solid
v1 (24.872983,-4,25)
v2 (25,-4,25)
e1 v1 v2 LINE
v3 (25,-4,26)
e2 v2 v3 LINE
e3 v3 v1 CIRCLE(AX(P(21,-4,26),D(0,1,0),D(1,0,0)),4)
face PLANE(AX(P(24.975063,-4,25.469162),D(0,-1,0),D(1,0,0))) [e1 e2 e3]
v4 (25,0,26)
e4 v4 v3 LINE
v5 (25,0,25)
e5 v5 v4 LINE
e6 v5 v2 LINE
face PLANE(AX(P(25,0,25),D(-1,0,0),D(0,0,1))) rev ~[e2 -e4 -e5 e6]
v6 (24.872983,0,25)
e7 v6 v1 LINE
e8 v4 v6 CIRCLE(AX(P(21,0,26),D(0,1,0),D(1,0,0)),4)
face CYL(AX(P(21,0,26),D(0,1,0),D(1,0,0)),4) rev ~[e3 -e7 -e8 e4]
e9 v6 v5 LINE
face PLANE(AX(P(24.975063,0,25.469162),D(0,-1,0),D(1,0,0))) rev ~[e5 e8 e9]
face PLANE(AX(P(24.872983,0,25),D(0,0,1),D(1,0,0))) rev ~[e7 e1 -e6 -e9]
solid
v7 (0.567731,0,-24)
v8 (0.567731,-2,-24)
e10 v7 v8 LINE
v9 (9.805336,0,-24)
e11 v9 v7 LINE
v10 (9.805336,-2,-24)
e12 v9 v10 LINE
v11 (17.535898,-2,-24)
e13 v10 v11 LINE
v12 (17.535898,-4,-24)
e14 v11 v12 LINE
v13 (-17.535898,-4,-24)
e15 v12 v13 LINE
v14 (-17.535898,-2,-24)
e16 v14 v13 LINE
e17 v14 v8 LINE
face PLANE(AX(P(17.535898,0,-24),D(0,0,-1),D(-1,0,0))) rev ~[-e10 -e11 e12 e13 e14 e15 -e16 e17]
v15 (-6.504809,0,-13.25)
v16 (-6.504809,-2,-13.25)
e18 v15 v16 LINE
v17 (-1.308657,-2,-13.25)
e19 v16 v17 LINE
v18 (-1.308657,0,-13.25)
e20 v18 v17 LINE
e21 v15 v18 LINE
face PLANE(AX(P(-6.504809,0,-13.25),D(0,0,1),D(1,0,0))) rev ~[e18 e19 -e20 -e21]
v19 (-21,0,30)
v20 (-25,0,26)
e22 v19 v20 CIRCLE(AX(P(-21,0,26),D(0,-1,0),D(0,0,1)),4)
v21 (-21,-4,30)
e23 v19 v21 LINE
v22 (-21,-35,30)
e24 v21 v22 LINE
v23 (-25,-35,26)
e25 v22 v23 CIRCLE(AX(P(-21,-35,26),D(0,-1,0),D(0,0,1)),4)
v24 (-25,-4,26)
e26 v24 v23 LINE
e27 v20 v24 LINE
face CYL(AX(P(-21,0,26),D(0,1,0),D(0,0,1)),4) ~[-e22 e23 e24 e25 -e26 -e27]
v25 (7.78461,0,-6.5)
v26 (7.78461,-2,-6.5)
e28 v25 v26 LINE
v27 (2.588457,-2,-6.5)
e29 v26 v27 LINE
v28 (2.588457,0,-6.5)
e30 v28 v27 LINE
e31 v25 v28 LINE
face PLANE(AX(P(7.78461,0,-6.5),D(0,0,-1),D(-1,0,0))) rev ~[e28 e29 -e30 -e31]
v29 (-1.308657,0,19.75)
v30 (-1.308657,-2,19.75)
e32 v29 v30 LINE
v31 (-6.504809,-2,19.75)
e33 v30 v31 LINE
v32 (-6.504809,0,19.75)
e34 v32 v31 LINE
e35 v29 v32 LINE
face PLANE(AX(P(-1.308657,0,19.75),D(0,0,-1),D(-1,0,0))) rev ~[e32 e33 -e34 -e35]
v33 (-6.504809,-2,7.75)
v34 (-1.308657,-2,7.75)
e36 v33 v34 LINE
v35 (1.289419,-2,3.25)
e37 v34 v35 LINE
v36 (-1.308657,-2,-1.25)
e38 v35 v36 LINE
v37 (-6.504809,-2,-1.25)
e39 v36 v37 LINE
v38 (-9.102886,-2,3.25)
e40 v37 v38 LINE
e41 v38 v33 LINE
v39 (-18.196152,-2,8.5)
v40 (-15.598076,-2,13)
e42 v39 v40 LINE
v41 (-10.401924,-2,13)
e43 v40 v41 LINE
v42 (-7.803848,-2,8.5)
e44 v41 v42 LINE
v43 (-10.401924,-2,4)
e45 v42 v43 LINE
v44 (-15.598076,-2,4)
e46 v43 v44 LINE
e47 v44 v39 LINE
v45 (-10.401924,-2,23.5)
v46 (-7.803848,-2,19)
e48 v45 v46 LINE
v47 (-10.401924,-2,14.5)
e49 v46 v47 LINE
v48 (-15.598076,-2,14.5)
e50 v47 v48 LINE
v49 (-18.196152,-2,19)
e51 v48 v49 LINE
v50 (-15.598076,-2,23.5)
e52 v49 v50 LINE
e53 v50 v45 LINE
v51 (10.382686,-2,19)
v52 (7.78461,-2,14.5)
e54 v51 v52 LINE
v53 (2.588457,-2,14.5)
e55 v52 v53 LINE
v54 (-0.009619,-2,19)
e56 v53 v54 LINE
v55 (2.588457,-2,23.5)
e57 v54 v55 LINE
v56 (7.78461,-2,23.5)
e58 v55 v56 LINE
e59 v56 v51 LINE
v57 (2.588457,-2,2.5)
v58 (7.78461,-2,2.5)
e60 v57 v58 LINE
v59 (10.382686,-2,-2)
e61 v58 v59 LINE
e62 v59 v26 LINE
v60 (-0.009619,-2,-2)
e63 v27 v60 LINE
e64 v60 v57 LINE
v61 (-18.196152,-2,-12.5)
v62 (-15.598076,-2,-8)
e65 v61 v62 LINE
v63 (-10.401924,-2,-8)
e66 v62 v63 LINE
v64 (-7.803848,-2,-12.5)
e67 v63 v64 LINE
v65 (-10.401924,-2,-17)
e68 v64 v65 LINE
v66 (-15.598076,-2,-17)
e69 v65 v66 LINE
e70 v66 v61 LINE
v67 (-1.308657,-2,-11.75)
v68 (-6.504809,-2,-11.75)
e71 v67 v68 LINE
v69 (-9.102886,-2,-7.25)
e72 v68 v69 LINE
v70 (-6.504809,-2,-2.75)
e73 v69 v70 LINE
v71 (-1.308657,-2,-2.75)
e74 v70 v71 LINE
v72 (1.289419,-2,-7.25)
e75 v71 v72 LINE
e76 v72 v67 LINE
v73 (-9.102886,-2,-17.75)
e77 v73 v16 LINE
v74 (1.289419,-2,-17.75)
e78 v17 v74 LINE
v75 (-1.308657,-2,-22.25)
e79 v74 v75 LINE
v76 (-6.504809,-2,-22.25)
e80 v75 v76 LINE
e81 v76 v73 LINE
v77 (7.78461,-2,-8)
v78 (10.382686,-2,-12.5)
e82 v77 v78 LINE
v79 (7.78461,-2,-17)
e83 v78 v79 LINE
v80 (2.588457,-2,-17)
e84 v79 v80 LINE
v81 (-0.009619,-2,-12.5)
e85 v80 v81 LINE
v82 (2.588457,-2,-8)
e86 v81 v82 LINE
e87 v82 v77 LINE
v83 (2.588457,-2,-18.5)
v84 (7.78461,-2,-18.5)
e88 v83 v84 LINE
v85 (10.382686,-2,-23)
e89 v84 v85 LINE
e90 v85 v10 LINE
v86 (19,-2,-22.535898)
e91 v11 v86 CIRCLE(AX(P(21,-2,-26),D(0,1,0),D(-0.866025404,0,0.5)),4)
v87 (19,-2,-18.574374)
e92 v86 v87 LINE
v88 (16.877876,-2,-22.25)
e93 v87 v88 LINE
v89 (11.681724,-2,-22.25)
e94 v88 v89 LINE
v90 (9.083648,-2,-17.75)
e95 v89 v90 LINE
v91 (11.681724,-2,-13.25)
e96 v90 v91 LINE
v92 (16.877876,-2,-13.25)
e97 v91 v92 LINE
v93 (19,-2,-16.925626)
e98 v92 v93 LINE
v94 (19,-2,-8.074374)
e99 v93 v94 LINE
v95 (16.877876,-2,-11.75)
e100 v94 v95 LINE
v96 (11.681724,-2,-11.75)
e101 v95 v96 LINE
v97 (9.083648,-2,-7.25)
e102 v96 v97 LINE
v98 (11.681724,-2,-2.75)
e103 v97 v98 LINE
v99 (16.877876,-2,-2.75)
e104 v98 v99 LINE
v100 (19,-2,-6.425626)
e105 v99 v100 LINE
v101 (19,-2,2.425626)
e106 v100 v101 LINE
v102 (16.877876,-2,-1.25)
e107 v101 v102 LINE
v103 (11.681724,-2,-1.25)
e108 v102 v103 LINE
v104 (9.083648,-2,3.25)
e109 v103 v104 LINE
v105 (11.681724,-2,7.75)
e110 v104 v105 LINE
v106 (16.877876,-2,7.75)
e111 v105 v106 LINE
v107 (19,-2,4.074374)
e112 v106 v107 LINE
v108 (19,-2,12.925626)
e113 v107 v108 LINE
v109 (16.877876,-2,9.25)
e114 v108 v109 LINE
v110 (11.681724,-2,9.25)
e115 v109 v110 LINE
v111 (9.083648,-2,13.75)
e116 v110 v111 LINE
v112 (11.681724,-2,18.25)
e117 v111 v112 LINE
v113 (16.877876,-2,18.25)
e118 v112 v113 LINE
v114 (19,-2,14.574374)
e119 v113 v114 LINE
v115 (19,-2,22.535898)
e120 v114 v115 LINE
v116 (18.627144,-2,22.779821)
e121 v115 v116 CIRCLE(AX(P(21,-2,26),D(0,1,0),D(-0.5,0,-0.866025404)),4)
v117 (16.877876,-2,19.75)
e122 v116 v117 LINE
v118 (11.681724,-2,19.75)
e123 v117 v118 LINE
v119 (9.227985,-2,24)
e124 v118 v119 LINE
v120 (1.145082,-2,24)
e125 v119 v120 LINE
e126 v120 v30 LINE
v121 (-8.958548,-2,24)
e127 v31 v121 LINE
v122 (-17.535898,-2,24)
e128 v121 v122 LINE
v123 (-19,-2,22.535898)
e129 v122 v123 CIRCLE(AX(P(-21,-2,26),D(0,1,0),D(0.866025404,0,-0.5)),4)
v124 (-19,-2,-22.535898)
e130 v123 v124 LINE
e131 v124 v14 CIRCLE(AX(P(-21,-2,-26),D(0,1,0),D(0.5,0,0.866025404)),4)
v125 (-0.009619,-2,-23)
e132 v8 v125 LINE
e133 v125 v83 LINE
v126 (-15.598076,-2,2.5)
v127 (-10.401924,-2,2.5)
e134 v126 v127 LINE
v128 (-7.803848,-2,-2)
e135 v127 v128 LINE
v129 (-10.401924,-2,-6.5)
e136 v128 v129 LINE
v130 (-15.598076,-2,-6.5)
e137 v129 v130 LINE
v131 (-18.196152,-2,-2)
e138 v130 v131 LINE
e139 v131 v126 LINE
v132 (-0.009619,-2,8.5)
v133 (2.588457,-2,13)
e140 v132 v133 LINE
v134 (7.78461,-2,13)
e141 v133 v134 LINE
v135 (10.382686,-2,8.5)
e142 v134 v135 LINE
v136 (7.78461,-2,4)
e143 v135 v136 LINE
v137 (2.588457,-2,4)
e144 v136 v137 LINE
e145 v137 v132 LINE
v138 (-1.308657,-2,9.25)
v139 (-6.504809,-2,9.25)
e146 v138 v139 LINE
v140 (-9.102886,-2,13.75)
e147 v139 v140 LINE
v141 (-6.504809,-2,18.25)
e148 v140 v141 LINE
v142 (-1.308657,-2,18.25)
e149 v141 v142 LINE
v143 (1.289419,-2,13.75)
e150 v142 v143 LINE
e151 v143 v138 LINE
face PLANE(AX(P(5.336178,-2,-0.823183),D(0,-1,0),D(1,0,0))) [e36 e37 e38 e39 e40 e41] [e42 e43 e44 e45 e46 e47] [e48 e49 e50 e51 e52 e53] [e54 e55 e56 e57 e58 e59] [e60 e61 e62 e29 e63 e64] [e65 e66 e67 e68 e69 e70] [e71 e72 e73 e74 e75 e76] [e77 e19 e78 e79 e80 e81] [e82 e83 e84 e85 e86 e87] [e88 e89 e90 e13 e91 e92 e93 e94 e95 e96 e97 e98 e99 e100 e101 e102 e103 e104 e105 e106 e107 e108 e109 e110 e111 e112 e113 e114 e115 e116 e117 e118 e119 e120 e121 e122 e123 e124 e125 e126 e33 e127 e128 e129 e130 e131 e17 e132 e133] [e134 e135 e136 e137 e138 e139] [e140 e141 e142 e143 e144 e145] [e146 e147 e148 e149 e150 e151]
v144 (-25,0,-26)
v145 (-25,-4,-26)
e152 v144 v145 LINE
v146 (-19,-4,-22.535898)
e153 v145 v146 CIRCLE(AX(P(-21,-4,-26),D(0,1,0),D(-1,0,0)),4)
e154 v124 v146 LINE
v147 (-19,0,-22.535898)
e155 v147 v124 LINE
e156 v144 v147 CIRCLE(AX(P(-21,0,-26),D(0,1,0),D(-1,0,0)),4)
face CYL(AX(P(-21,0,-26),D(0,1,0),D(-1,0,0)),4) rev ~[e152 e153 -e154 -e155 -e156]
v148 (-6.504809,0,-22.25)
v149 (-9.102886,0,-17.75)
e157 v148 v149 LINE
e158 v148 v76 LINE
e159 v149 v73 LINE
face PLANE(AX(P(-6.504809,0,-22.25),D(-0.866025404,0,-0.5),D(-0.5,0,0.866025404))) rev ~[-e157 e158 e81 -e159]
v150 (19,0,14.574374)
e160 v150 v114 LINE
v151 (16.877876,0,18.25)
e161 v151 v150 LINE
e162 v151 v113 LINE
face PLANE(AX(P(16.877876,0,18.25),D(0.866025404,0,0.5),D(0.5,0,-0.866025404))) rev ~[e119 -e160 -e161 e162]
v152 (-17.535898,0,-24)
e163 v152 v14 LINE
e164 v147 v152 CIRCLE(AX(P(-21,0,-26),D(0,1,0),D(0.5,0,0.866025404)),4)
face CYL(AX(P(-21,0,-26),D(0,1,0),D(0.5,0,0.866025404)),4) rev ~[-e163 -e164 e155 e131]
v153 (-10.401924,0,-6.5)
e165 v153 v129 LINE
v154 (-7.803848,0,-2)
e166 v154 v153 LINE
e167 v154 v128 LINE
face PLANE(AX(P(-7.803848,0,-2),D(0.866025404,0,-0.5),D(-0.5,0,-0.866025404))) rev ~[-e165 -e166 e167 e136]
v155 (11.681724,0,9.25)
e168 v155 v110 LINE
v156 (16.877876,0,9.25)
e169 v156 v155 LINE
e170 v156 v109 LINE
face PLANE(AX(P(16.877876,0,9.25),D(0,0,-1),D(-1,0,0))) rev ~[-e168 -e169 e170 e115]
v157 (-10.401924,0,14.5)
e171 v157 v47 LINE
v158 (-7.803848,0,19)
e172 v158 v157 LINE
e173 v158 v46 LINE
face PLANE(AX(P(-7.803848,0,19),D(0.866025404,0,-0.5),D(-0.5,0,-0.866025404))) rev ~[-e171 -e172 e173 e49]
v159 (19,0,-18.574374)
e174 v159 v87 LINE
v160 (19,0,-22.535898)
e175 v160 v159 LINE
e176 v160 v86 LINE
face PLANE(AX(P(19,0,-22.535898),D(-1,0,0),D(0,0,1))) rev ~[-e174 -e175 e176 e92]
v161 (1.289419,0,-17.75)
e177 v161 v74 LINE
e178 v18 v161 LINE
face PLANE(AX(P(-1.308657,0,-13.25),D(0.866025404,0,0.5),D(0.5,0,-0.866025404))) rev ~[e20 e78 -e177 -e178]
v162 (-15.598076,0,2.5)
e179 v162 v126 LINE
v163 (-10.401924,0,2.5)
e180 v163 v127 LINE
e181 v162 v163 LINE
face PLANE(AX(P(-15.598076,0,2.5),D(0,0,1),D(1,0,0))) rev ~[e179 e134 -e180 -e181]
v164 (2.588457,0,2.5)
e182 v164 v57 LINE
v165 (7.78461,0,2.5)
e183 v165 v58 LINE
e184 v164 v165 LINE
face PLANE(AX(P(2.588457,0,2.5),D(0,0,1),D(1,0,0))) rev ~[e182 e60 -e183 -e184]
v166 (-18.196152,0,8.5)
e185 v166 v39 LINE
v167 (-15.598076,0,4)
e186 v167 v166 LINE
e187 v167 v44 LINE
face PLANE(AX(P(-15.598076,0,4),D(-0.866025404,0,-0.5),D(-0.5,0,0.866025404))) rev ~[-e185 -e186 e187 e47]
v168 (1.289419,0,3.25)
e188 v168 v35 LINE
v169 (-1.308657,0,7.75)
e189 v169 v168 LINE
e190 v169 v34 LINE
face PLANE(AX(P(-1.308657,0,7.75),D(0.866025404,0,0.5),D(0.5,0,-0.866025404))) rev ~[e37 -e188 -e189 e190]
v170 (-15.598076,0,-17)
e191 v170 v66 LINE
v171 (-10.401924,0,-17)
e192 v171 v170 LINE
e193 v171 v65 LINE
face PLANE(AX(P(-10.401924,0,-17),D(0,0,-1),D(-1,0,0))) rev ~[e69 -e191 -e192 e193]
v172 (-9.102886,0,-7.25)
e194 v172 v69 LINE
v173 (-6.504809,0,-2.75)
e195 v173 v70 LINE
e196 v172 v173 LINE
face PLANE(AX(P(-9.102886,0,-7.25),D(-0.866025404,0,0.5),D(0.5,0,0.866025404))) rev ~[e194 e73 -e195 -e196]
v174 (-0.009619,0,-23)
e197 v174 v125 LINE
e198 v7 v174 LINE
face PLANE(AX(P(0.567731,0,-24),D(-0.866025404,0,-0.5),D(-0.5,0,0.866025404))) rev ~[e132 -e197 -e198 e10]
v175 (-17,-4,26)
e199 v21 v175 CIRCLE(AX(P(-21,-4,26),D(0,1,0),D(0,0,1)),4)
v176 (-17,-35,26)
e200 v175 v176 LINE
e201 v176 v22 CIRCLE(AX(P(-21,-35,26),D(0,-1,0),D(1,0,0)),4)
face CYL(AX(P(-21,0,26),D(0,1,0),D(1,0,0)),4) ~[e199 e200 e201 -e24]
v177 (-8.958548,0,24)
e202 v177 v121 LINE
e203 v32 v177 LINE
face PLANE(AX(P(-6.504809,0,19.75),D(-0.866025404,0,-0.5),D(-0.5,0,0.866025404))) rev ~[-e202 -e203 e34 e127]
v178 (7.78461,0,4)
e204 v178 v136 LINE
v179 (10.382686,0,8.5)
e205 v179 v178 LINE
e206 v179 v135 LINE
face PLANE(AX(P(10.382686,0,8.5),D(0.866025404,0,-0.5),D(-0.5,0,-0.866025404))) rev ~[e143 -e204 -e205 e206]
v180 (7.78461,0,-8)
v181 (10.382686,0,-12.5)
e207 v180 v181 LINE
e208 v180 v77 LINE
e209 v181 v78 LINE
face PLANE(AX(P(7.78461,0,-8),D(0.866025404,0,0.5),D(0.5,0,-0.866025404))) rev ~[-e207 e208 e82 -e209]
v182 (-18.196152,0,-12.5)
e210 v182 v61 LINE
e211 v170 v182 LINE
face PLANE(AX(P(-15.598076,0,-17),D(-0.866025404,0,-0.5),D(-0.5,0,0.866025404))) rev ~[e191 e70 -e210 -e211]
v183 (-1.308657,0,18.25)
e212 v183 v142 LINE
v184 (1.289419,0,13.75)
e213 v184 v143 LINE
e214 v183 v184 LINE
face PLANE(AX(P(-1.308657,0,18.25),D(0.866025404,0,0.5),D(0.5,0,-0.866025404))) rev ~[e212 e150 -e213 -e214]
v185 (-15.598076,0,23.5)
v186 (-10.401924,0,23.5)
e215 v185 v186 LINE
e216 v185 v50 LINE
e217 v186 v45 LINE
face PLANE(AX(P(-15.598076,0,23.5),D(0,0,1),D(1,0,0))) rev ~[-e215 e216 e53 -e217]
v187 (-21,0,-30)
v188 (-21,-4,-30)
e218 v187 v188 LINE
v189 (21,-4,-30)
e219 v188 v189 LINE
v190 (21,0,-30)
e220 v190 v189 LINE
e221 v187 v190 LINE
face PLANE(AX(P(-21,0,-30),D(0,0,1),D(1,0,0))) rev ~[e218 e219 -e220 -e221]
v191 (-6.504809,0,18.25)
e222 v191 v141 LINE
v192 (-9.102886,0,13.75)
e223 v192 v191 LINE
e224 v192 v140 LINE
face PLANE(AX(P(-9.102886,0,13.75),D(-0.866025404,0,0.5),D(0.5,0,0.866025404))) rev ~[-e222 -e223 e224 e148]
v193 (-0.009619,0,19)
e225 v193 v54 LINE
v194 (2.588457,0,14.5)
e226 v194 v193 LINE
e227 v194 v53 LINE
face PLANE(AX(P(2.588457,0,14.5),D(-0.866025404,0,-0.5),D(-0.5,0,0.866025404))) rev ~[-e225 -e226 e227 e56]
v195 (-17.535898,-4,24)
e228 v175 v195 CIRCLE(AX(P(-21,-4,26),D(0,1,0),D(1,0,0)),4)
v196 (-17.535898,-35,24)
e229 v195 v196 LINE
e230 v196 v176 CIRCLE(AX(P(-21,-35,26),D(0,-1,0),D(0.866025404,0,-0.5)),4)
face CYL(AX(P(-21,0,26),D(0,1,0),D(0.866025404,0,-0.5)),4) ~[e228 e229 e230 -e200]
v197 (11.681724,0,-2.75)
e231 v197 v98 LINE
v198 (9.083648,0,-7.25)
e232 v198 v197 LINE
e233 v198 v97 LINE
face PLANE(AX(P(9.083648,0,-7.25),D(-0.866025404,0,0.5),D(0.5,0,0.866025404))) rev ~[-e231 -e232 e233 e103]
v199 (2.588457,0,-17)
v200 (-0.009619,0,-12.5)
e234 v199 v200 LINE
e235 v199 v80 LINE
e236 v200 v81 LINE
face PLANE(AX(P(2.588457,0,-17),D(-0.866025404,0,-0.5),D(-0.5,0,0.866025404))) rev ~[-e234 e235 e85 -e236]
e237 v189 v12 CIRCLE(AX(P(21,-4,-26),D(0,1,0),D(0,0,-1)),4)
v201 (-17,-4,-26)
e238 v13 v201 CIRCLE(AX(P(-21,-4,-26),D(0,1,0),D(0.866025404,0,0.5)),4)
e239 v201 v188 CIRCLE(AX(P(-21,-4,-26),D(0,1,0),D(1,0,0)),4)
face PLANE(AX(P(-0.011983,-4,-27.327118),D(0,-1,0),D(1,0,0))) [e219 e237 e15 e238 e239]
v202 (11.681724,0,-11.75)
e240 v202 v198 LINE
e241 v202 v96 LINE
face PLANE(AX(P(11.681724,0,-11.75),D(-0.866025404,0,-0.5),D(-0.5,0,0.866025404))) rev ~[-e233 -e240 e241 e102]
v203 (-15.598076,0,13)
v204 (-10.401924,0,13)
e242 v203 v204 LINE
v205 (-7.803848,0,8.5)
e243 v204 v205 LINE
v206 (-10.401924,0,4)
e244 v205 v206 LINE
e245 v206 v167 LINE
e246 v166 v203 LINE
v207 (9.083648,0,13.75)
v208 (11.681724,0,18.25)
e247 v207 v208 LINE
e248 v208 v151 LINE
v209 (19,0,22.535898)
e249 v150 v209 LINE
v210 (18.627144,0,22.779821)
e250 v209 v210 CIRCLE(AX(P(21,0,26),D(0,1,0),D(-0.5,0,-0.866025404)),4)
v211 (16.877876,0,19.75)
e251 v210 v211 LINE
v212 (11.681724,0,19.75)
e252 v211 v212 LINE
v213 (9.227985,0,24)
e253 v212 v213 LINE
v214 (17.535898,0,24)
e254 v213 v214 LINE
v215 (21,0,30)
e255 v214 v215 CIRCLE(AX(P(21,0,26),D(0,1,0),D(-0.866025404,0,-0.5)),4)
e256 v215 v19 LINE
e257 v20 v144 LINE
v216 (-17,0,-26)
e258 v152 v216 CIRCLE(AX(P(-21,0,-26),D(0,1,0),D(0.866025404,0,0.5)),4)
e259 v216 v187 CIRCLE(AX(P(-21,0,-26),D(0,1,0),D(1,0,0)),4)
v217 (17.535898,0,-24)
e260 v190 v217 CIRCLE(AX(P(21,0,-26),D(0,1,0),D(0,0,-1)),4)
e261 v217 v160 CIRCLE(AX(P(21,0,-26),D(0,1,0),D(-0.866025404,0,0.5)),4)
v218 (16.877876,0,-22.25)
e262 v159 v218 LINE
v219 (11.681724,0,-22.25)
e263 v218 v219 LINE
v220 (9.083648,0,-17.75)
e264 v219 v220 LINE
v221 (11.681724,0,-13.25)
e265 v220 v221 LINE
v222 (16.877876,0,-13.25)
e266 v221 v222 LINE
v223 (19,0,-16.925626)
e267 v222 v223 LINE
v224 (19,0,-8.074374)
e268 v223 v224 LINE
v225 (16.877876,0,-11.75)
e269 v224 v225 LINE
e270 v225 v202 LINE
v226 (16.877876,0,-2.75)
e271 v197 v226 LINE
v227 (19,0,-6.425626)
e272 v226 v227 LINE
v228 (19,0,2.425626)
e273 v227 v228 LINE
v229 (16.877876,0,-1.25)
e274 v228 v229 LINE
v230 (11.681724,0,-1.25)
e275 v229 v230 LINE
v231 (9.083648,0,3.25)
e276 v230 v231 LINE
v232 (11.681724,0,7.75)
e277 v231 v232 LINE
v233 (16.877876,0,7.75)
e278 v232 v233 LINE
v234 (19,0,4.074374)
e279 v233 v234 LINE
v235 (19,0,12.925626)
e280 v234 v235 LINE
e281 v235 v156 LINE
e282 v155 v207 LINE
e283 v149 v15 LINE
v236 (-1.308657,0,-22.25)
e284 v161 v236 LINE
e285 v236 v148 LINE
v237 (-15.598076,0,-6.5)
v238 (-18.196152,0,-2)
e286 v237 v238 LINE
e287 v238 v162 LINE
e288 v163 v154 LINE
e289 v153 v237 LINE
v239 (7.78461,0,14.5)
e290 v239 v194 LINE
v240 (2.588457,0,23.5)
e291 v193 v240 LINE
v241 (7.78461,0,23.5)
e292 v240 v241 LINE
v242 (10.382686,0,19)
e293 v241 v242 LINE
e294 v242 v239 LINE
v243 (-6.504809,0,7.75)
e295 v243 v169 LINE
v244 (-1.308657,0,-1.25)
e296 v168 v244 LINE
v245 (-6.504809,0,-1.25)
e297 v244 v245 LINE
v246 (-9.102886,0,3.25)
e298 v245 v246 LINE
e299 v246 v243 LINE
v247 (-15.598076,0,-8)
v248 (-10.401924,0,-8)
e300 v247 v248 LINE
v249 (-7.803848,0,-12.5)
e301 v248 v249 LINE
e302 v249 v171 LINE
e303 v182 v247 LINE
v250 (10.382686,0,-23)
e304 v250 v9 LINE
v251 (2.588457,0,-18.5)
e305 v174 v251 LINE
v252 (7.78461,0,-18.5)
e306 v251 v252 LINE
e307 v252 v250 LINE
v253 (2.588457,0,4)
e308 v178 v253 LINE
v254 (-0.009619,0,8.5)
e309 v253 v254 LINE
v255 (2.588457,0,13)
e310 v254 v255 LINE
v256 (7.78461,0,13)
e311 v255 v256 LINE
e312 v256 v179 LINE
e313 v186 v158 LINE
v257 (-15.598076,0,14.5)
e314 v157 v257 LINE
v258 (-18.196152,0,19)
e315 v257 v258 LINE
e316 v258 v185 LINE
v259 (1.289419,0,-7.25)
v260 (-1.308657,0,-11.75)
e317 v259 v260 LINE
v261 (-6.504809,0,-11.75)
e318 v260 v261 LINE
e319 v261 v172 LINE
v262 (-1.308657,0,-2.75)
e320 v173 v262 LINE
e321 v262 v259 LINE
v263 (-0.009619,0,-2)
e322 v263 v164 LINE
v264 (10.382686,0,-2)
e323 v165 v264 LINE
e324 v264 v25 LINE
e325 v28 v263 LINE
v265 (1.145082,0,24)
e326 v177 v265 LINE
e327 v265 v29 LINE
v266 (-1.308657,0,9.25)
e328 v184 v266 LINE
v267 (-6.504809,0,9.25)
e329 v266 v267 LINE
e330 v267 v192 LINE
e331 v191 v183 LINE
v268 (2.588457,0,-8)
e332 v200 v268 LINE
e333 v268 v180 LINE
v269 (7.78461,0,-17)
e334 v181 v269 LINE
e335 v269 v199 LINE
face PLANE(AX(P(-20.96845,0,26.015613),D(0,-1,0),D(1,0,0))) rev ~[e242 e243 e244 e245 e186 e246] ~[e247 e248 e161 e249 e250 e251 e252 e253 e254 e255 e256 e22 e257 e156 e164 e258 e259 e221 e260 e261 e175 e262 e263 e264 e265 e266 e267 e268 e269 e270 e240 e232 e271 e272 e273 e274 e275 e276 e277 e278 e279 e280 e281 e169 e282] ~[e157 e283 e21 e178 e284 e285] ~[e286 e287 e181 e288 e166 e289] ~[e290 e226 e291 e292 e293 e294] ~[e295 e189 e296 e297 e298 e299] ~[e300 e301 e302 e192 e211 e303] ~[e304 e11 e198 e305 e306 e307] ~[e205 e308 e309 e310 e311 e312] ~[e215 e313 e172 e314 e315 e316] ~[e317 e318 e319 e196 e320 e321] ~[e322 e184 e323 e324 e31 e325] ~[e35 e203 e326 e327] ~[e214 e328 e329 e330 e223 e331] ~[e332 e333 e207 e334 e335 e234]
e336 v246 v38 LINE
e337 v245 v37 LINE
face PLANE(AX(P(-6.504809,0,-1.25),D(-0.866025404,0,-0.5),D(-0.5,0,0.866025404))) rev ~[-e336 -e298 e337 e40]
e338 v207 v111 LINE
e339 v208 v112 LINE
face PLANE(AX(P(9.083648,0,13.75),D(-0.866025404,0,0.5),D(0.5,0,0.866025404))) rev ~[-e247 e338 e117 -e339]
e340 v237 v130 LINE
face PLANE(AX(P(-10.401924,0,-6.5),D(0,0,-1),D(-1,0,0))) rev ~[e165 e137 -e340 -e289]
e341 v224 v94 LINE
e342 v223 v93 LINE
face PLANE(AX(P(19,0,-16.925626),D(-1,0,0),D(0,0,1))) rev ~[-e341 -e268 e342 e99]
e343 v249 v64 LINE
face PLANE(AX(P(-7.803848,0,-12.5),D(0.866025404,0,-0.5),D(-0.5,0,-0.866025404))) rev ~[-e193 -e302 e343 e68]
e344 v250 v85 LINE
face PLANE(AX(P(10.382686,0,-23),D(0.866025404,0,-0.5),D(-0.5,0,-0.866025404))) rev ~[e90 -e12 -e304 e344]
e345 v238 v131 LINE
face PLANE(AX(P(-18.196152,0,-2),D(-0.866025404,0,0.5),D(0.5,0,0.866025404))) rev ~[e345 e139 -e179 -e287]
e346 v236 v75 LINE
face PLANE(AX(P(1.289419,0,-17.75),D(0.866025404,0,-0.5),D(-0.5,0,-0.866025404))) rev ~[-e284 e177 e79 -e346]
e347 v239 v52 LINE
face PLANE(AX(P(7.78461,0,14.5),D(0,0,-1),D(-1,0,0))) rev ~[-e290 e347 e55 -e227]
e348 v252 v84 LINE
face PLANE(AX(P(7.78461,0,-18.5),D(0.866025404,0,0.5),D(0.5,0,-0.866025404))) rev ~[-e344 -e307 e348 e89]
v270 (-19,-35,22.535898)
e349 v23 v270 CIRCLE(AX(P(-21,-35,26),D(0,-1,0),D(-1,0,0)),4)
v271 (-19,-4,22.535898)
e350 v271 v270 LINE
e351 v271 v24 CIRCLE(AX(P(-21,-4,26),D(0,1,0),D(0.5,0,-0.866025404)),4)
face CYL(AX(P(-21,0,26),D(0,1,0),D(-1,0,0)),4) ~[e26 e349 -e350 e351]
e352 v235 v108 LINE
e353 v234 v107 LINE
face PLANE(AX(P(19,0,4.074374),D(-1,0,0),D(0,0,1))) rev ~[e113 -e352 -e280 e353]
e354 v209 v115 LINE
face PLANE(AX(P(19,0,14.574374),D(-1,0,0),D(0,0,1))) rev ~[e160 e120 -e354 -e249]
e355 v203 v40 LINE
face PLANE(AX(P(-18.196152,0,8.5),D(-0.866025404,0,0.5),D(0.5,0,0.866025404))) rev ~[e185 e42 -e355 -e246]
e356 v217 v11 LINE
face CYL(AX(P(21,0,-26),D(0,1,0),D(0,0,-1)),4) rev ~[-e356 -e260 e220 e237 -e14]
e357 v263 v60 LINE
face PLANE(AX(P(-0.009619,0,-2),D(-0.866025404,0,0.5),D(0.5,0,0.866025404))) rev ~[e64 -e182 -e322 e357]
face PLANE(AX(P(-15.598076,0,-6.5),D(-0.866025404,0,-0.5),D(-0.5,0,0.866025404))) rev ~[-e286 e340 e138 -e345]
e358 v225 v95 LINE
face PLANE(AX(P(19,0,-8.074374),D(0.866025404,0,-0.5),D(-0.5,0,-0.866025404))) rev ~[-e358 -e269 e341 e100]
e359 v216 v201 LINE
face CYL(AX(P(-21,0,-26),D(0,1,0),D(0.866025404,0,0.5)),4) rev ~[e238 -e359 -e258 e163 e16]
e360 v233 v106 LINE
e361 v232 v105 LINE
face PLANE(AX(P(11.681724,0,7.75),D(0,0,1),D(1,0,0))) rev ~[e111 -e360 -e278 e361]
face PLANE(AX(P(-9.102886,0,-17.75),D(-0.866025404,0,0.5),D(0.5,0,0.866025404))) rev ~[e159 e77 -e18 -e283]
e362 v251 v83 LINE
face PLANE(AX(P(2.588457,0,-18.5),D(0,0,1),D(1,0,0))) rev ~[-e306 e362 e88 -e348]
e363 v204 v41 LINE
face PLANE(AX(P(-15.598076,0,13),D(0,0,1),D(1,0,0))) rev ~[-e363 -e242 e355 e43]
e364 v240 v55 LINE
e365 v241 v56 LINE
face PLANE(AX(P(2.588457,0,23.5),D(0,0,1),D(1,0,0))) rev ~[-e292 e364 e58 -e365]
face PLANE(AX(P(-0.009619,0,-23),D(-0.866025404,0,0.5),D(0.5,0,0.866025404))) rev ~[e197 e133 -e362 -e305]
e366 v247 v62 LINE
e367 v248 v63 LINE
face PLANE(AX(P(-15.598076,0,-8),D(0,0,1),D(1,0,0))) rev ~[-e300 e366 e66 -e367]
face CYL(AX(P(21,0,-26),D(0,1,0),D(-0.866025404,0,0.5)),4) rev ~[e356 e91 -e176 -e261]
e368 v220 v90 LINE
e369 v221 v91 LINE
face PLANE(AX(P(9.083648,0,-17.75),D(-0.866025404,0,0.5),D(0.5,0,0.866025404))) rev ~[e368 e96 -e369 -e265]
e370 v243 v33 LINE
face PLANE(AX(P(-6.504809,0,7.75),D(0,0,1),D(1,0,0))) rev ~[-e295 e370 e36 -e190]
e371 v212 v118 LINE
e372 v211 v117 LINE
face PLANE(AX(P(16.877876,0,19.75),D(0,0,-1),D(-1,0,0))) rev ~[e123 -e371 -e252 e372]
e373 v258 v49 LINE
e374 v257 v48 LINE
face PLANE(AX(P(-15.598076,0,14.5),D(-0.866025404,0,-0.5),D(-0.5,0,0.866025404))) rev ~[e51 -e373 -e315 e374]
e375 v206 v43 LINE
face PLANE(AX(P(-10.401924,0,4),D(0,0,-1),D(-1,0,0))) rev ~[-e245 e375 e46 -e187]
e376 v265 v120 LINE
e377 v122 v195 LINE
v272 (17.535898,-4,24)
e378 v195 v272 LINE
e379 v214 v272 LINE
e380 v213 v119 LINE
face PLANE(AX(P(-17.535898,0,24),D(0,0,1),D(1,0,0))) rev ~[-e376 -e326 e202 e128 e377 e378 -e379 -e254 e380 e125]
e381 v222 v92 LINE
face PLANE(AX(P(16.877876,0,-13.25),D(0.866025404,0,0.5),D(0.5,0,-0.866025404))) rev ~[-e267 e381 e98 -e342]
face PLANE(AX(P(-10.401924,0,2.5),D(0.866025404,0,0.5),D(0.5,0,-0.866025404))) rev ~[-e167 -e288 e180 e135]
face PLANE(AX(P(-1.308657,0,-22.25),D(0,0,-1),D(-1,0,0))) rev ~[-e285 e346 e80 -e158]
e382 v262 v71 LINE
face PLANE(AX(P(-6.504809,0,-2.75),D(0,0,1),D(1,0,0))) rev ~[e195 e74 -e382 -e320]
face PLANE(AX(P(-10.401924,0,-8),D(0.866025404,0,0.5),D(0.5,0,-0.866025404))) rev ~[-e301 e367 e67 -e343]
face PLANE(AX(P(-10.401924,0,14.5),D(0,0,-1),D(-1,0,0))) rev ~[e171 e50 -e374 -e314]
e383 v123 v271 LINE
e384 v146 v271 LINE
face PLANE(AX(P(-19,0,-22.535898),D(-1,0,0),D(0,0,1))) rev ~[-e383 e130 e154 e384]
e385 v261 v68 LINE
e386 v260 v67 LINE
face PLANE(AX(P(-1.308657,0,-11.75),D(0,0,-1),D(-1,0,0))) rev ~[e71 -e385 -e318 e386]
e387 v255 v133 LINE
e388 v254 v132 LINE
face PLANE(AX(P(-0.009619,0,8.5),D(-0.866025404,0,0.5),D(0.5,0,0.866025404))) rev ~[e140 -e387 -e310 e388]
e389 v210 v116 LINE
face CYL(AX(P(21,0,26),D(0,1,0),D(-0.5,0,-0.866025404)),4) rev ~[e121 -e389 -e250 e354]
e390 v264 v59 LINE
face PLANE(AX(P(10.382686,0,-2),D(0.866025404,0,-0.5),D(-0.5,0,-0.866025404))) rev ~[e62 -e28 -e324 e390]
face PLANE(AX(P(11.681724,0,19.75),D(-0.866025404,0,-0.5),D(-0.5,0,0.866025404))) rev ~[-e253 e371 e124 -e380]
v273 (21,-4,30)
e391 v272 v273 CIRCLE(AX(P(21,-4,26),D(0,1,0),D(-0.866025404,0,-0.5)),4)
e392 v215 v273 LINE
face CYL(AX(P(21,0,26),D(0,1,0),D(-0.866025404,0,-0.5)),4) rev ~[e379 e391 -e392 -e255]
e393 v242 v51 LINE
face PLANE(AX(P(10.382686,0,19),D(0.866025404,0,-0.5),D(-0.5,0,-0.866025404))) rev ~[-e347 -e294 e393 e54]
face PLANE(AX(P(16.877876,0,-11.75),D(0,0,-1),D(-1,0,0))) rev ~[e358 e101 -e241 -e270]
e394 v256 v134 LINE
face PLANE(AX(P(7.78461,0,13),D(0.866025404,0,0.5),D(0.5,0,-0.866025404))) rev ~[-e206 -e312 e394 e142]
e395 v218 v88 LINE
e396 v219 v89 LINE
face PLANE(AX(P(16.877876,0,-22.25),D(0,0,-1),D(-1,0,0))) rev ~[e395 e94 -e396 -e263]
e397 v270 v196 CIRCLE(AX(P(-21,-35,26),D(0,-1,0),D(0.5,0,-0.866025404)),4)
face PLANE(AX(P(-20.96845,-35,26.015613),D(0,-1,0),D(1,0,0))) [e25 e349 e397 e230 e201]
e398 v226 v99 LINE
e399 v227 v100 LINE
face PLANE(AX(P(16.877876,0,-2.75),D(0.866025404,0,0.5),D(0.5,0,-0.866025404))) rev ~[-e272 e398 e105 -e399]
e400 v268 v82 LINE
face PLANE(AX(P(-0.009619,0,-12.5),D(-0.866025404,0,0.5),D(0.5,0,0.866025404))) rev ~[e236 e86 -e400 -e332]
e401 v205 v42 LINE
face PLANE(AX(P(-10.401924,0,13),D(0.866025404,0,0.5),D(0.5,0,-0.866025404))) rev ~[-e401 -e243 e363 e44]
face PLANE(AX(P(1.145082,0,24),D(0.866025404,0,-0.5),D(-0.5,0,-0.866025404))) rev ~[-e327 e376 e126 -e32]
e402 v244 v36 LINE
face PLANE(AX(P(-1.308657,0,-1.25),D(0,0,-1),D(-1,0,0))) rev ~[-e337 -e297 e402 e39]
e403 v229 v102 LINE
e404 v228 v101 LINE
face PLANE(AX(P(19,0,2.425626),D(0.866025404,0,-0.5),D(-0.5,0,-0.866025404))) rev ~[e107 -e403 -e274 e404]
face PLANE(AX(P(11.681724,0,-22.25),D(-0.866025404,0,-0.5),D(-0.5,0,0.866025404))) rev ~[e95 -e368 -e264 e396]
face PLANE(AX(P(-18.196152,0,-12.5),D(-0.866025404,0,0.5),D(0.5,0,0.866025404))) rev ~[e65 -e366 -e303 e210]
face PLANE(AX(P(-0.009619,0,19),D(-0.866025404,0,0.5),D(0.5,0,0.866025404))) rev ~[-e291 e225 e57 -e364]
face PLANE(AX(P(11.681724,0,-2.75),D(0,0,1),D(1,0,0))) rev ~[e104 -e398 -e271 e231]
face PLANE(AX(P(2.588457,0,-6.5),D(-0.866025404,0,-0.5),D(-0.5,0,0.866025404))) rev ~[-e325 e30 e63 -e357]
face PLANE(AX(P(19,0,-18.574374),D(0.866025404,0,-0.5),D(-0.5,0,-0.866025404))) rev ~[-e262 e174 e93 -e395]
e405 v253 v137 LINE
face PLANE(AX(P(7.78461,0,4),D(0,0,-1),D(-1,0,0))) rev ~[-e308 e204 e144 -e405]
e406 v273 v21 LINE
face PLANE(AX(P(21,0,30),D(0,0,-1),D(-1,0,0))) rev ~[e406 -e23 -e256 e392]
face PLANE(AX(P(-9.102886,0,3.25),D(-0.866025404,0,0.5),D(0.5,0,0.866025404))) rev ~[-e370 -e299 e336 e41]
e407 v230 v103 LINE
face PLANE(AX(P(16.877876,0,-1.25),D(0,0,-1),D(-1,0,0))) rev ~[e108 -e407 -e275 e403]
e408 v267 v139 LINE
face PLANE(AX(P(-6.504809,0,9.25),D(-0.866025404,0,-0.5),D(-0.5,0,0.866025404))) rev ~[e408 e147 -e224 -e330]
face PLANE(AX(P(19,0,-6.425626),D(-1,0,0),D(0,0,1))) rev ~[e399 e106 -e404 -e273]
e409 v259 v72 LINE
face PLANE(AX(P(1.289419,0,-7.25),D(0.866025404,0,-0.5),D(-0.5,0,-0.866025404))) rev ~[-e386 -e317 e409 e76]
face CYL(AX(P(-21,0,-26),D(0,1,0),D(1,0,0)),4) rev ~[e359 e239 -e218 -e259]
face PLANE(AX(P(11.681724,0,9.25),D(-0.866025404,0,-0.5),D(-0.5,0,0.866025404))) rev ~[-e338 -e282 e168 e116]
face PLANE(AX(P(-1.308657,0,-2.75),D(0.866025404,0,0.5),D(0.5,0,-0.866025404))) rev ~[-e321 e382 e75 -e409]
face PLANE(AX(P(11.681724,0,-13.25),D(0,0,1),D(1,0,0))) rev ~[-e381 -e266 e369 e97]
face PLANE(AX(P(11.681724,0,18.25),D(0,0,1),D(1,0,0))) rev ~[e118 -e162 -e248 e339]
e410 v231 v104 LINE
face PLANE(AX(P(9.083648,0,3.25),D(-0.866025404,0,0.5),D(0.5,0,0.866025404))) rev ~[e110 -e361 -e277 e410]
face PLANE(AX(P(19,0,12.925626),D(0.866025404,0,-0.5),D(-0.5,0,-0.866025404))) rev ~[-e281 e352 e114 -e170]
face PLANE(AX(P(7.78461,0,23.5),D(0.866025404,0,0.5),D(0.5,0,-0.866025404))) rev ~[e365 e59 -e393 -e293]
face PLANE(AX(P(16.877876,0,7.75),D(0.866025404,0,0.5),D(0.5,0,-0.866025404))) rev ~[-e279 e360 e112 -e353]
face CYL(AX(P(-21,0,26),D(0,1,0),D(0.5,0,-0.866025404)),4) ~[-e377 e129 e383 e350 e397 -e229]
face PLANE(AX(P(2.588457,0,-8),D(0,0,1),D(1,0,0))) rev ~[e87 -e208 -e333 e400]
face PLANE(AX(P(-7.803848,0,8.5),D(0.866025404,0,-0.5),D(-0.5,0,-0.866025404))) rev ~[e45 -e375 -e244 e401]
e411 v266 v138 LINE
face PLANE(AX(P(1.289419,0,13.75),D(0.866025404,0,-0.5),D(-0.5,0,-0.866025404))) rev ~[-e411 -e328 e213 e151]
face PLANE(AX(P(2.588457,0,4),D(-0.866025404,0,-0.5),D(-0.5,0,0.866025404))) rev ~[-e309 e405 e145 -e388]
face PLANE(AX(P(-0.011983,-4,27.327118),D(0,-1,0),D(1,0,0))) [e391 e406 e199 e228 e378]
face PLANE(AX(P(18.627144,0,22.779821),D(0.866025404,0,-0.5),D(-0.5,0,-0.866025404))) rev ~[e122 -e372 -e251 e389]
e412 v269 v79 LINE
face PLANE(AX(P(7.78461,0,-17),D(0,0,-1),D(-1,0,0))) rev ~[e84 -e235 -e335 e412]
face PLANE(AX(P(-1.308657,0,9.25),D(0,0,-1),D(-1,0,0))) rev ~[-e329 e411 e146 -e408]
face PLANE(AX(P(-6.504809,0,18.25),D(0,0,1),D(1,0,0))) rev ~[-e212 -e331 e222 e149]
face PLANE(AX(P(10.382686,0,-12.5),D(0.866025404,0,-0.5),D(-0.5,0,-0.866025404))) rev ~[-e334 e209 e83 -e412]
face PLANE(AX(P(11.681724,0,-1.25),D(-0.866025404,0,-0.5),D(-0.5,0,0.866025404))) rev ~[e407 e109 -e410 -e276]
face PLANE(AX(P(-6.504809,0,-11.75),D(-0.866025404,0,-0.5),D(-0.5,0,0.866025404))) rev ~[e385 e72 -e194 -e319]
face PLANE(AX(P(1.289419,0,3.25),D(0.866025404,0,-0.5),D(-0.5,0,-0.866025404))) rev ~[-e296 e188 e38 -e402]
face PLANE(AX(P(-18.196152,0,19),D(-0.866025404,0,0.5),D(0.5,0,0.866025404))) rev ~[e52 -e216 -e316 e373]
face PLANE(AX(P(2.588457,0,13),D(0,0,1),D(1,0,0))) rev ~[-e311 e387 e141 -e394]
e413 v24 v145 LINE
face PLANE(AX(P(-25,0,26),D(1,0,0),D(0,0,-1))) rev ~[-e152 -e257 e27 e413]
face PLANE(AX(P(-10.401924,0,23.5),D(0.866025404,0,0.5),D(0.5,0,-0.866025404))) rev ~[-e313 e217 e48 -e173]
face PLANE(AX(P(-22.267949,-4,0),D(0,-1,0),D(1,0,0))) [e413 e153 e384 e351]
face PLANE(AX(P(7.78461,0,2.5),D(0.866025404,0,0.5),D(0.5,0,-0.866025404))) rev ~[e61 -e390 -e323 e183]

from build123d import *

# Parameters (mm, degrees)
F1_DEPTH = 2
F2_DEPTH = 4
F3_DEPTH = 35


# Not quite as in the source:
# - a feature of the source that left no trace in its solid (it failed there, or was rolled back) is left out
# - a feature names something its author has since deleted; it is built from what else it names


with BuildPart() as f1:
    # F0 (on Front) → F1 (new body)
    with BuildSketch(Plane.XZ):
        with BuildLine():
            Line((-8.9585481157, 24), (-17.5358983849, 24))
            ThreePointArc((-17.5358983849, 24), (-18.1715728753, 23.1715728753), (-19, 22.5358983849))
            Line((-19, 22.5358983849), (-19, -22.5358983849))
            ThreePointArc((-19, -22.5358983849), (-18.1715728753, -23.1715728753), (-17.5358983849, -24))
            Line((-17.5358983849, -24), (-8.3811978465, -24))
            Line((-8.3811978465, -24), (0.567731326, -24))
            Line((0.567731326, -24), (-0.0096189432, -23))
            Line((-0.0096189432, -23), (2.5884572681, -18.5))
            Line((2.5884572681, -18.5), (7.7846096908, -18.5))
            Line((7.7846096908, -18.5), (10.3826859022, -23))
            Line((10.3826859022, -23), (9.805335633, -24))
            Line((9.805335633, -24), (17.5358983849, -24))
            ThreePointArc((17.5358983849, -24), (18.1715728753, -23.1715728753), (19, -22.5358983849))
            Line((19, -22.5358983849), (19, -18.5743741578))
            Line((19, -18.5743741578), (16.8778764306, -22.25))
            Line((16.8778764306, -22.25), (11.6817240079, -22.25))
            Line((11.6817240079, -22.25), (9.0836477965, -17.75))
            Line((9.0836477965, -17.75), (11.6817240079, -13.25))
            Line((11.6817240079, -13.25), (16.8778764306, -13.25))
            Line((16.8778764306, -13.25), (19, -16.9256258422))
            Line((19, -16.9256258422), (19, -8.0743741578))
            Line((19, -8.0743741578), (16.8778764306, -11.75))
            Line((16.8778764306, -11.75), (11.6817240079, -11.75))
            Line((11.6817240079, -11.75), (9.0836477965, -7.25))
            Line((9.0836477965, -7.25), (11.6817240079, -2.75))
            Line((11.6817240079, -2.75), (16.8778764306, -2.75))
            Line((16.8778764306, -2.75), (19, -6.4256258422))
            Line((19, -6.4256258422), (19, 2.4256258422))
            Line((19, 2.4256258422), (16.8778764306, -1.25))
            Line((16.8778764306, -1.25), (11.6817240079, -1.25))
            Line((11.6817240079, -1.25), (9.0836477965, 3.25))
            Line((9.0836477965, 3.25), (11.6817240079, 7.75))
            Line((11.6817240079, 7.75), (16.8778764306, 7.75))
            Line((16.8778764306, 7.75), (19, 4.0743741578))
            Line((19, 4.0743741578), (19, 12.9256258422))
            Line((19, 12.9256258422), (16.8778764306, 9.25))
            Line((16.8778764306, 9.25), (11.6817240079, 9.25))
            Line((11.6817240079, 9.25), (9.0836477965, 13.75))
            Line((9.0836477965, 13.75), (11.6817240079, 18.25))
            Line((11.6817240079, 18.25), (16.8778764306, 18.25))
            Line((16.8778764306, 18.25), (19, 14.5743741578))
            Line((19, 14.5743741578), (19, 22.5358983849))
            ThreePointArc((19, 22.5358983849), (18.8101731757, 22.6526639727), (18.6271441796, 22.7798206174))
            Line((18.6271441796, 22.7798206174), (16.8778764306, 19.75))
            Line((16.8778764306, 19.75), (11.6817240079, 19.75))
            Line((11.6817240079, 19.75), (9.2279853638, 24))
            Line((9.2279853638, 24), (1.1450815951, 24))
            Line((1.1450815951, 24), (-1.3086570489, 19.75))
            Line((-1.3086570489, 19.75), (-6.5048094716, 19.75))
            Line((-6.5048094716, 19.75), (-8.9585481157, 24))
        make_face()
        Polygon((1.2894191624, -17.75), (-1.3086570489, -22.25), (-6.5048094716, -22.25), (-9.102885683, -17.75), (-6.5048094716, -13.25), (-1.3086570489, -13.25), align=None, mode=Mode.SUBTRACT)
        Polygon((-7.8038475773, -12.5), (-10.4019237886, -17), (-15.5980762114, -17), (-18.1961524227, -12.5), (-15.5980762114, -8), (-10.4019237886, -8), align=None, mode=Mode.SUBTRACT)
        Polygon((-7.8038475773, -2), (-10.4019237886, -6.5), (-15.5980762114, -6.5), (-18.1961524227, -2), (-15.5980762114, 2.5), (-10.4019237886, 2.5), align=None, mode=Mode.SUBTRACT)
        Polygon((1.2894191624, -7.25), (-1.3086570489, -11.75), (-6.5048094716, -11.75), (-9.102885683, -7.25), (-6.5048094716, -2.75), (-1.3086570489, -2.75), align=None, mode=Mode.SUBTRACT)
        Polygon((10.3826859022, -12.5), (7.7846096908, -17), (2.5884572681, -17), (-0.0096189432, -12.5), (2.5884572681, -8), (7.7846096908, -8), align=None, mode=Mode.SUBTRACT)
        Polygon((10.3826859022, -2), (7.7846096908, -6.5), (2.5884572681, -6.5), (-0.0096189432, -2), (2.5884572681, 2.5), (7.7846096908, 2.5), align=None, mode=Mode.SUBTRACT)
        Polygon((-7.8038475773, 8.5), (-10.4019237886, 4), (-15.5980762114, 4), (-18.1961524227, 8.5), (-15.5980762114, 13), (-10.4019237886, 13), align=None, mode=Mode.SUBTRACT)
        Polygon((1.2894191624, 3.25), (-1.3086570489, -1.25), (-6.5048094716, -1.25), (-9.102885683, 3.25), (-6.5048094716, 7.75), (-1.3086570489, 7.75), align=None, mode=Mode.SUBTRACT)
        Polygon((1.2894191624, 13.75), (-1.3086570489, 9.25), (-6.5048094716, 9.25), (-9.102885683, 13.75), (-6.5048094716, 18.25), (-1.3086570489, 18.25), align=None, mode=Mode.SUBTRACT)
        Polygon((-10.4019237886, 23.5), (-7.8038475773, 19), (-10.4019237886, 14.5), (-15.5980762114, 14.5), (-18.1961524227, 19), (-15.5980762114, 23.5), align=None, mode=Mode.SUBTRACT)
        Polygon((10.3826859022, 8.5), (7.7846096908, 4), (2.5884572681, 4), (-0.0096189432, 8.5), (2.5884572681, 13), (7.7846096908, 13), align=None, mode=Mode.SUBTRACT)
        Polygon((10.3826859022, 19), (7.7846096908, 14.5), (2.5884572681, 14.5), (-0.0096189432, 19), (2.5884572681, 23.5), (7.7846096908, 23.5), align=None, mode=Mode.SUBTRACT)
    extrude(amount=F1_DEPTH)

    # F0 (on Front) → F2, piece 2 (join)
    with BuildSketch(Plane.XZ):
        with BuildLine():
            Line((21, 30), (-21, 30))
            ThreePointArc((-21, 30), (-18.1715728753, 28.8284271247), (-17, 26))
            ThreePointArc((-17, 26), (-17.1362966948, 24.9647238196), (-17.5358983849, 24))
            Line((-17.5358983849, 24), (-8.9585481157, 24))
            Line((-8.9585481157, 24), (1.1450815951, 24))
            Line((1.1450815951, 24), (9.2279853638, 24))
            Line((9.2279853638, 24), (17.5358983849, 24))
            ThreePointArc((17.5358983849, 24), (17.5358983849, 28), (21, 30))
        make_face()
        with BuildLine():
            ThreePointArc((-19, 22.5358983849), (-23, 22.5358983849), (-25, 26))
            Line((-25, 26), (-25, -26))
            ThreePointArc((-25, -26), (-23, -22.5358983849), (-19, -22.5358983849))
            Line((-19, -22.5358983849), (-19, 22.5358983849))
        make_face()
        with BuildLine():
            ThreePointArc((-17, -26), (-18.1715728753, -28.8284271247), (-21, -30))
            Line((-21, -30), (21, -30))
            ThreePointArc((21, -30), (17.5358983849, -28), (17.5358983849, -24))
            Line((17.5358983849, -24), (9.805335633, -24))
            Line((9.805335633, -24), (0.567731326, -24))
            Line((0.567731326, -24), (-8.3811978465, -24))
            Line((-8.3811978465, -24), (-17.5358983849, -24))
            ThreePointArc((-17.5358983849, -24), (-17.1362966948, -24.9647238196), (-17, -26))
        make_face()
    extrude(amount=F2_DEPTH)

    # F0 (on Front) → F3 (join)
    with BuildSketch(Plane.XZ):
        with BuildLine():
            ThreePointArc((-17, 26), (-18.1715728753, 28.8284271247), (-21, 30))
            ThreePointArc((-21, 30), (-23.8284271247, 28.8284271247), (-25, 26))
            ThreePointArc((-25, 26), (-23, 22.5358983849), (-19, 22.5358983849))
            ThreePointArc((-19, 22.5358983849), (-18.1715728753, 23.1715728753), (-17.5358983849, 24))
            ThreePointArc((-17.5358983849, 24), (-17.1362966948, 24.9647238196), (-17, 26))
        make_face()
    extrude(amount=F3_DEPTH)


with BuildPart() as f2:
    # F0 (on Front) → F2 (new body)
    with BuildSketch(Plane.XZ):
        with BuildLine():
            Line((25, 25), (25, 26))
            ThreePointArc((25, 26), (24.9681187851, 25.4959828301), (24.8729833462, 25))
            Line((24.8729833462, 25), (25, 25))
        make_face()
    extrude(amount=F2_DEPTH)


solid = Compound([f1.part, f2.part])
